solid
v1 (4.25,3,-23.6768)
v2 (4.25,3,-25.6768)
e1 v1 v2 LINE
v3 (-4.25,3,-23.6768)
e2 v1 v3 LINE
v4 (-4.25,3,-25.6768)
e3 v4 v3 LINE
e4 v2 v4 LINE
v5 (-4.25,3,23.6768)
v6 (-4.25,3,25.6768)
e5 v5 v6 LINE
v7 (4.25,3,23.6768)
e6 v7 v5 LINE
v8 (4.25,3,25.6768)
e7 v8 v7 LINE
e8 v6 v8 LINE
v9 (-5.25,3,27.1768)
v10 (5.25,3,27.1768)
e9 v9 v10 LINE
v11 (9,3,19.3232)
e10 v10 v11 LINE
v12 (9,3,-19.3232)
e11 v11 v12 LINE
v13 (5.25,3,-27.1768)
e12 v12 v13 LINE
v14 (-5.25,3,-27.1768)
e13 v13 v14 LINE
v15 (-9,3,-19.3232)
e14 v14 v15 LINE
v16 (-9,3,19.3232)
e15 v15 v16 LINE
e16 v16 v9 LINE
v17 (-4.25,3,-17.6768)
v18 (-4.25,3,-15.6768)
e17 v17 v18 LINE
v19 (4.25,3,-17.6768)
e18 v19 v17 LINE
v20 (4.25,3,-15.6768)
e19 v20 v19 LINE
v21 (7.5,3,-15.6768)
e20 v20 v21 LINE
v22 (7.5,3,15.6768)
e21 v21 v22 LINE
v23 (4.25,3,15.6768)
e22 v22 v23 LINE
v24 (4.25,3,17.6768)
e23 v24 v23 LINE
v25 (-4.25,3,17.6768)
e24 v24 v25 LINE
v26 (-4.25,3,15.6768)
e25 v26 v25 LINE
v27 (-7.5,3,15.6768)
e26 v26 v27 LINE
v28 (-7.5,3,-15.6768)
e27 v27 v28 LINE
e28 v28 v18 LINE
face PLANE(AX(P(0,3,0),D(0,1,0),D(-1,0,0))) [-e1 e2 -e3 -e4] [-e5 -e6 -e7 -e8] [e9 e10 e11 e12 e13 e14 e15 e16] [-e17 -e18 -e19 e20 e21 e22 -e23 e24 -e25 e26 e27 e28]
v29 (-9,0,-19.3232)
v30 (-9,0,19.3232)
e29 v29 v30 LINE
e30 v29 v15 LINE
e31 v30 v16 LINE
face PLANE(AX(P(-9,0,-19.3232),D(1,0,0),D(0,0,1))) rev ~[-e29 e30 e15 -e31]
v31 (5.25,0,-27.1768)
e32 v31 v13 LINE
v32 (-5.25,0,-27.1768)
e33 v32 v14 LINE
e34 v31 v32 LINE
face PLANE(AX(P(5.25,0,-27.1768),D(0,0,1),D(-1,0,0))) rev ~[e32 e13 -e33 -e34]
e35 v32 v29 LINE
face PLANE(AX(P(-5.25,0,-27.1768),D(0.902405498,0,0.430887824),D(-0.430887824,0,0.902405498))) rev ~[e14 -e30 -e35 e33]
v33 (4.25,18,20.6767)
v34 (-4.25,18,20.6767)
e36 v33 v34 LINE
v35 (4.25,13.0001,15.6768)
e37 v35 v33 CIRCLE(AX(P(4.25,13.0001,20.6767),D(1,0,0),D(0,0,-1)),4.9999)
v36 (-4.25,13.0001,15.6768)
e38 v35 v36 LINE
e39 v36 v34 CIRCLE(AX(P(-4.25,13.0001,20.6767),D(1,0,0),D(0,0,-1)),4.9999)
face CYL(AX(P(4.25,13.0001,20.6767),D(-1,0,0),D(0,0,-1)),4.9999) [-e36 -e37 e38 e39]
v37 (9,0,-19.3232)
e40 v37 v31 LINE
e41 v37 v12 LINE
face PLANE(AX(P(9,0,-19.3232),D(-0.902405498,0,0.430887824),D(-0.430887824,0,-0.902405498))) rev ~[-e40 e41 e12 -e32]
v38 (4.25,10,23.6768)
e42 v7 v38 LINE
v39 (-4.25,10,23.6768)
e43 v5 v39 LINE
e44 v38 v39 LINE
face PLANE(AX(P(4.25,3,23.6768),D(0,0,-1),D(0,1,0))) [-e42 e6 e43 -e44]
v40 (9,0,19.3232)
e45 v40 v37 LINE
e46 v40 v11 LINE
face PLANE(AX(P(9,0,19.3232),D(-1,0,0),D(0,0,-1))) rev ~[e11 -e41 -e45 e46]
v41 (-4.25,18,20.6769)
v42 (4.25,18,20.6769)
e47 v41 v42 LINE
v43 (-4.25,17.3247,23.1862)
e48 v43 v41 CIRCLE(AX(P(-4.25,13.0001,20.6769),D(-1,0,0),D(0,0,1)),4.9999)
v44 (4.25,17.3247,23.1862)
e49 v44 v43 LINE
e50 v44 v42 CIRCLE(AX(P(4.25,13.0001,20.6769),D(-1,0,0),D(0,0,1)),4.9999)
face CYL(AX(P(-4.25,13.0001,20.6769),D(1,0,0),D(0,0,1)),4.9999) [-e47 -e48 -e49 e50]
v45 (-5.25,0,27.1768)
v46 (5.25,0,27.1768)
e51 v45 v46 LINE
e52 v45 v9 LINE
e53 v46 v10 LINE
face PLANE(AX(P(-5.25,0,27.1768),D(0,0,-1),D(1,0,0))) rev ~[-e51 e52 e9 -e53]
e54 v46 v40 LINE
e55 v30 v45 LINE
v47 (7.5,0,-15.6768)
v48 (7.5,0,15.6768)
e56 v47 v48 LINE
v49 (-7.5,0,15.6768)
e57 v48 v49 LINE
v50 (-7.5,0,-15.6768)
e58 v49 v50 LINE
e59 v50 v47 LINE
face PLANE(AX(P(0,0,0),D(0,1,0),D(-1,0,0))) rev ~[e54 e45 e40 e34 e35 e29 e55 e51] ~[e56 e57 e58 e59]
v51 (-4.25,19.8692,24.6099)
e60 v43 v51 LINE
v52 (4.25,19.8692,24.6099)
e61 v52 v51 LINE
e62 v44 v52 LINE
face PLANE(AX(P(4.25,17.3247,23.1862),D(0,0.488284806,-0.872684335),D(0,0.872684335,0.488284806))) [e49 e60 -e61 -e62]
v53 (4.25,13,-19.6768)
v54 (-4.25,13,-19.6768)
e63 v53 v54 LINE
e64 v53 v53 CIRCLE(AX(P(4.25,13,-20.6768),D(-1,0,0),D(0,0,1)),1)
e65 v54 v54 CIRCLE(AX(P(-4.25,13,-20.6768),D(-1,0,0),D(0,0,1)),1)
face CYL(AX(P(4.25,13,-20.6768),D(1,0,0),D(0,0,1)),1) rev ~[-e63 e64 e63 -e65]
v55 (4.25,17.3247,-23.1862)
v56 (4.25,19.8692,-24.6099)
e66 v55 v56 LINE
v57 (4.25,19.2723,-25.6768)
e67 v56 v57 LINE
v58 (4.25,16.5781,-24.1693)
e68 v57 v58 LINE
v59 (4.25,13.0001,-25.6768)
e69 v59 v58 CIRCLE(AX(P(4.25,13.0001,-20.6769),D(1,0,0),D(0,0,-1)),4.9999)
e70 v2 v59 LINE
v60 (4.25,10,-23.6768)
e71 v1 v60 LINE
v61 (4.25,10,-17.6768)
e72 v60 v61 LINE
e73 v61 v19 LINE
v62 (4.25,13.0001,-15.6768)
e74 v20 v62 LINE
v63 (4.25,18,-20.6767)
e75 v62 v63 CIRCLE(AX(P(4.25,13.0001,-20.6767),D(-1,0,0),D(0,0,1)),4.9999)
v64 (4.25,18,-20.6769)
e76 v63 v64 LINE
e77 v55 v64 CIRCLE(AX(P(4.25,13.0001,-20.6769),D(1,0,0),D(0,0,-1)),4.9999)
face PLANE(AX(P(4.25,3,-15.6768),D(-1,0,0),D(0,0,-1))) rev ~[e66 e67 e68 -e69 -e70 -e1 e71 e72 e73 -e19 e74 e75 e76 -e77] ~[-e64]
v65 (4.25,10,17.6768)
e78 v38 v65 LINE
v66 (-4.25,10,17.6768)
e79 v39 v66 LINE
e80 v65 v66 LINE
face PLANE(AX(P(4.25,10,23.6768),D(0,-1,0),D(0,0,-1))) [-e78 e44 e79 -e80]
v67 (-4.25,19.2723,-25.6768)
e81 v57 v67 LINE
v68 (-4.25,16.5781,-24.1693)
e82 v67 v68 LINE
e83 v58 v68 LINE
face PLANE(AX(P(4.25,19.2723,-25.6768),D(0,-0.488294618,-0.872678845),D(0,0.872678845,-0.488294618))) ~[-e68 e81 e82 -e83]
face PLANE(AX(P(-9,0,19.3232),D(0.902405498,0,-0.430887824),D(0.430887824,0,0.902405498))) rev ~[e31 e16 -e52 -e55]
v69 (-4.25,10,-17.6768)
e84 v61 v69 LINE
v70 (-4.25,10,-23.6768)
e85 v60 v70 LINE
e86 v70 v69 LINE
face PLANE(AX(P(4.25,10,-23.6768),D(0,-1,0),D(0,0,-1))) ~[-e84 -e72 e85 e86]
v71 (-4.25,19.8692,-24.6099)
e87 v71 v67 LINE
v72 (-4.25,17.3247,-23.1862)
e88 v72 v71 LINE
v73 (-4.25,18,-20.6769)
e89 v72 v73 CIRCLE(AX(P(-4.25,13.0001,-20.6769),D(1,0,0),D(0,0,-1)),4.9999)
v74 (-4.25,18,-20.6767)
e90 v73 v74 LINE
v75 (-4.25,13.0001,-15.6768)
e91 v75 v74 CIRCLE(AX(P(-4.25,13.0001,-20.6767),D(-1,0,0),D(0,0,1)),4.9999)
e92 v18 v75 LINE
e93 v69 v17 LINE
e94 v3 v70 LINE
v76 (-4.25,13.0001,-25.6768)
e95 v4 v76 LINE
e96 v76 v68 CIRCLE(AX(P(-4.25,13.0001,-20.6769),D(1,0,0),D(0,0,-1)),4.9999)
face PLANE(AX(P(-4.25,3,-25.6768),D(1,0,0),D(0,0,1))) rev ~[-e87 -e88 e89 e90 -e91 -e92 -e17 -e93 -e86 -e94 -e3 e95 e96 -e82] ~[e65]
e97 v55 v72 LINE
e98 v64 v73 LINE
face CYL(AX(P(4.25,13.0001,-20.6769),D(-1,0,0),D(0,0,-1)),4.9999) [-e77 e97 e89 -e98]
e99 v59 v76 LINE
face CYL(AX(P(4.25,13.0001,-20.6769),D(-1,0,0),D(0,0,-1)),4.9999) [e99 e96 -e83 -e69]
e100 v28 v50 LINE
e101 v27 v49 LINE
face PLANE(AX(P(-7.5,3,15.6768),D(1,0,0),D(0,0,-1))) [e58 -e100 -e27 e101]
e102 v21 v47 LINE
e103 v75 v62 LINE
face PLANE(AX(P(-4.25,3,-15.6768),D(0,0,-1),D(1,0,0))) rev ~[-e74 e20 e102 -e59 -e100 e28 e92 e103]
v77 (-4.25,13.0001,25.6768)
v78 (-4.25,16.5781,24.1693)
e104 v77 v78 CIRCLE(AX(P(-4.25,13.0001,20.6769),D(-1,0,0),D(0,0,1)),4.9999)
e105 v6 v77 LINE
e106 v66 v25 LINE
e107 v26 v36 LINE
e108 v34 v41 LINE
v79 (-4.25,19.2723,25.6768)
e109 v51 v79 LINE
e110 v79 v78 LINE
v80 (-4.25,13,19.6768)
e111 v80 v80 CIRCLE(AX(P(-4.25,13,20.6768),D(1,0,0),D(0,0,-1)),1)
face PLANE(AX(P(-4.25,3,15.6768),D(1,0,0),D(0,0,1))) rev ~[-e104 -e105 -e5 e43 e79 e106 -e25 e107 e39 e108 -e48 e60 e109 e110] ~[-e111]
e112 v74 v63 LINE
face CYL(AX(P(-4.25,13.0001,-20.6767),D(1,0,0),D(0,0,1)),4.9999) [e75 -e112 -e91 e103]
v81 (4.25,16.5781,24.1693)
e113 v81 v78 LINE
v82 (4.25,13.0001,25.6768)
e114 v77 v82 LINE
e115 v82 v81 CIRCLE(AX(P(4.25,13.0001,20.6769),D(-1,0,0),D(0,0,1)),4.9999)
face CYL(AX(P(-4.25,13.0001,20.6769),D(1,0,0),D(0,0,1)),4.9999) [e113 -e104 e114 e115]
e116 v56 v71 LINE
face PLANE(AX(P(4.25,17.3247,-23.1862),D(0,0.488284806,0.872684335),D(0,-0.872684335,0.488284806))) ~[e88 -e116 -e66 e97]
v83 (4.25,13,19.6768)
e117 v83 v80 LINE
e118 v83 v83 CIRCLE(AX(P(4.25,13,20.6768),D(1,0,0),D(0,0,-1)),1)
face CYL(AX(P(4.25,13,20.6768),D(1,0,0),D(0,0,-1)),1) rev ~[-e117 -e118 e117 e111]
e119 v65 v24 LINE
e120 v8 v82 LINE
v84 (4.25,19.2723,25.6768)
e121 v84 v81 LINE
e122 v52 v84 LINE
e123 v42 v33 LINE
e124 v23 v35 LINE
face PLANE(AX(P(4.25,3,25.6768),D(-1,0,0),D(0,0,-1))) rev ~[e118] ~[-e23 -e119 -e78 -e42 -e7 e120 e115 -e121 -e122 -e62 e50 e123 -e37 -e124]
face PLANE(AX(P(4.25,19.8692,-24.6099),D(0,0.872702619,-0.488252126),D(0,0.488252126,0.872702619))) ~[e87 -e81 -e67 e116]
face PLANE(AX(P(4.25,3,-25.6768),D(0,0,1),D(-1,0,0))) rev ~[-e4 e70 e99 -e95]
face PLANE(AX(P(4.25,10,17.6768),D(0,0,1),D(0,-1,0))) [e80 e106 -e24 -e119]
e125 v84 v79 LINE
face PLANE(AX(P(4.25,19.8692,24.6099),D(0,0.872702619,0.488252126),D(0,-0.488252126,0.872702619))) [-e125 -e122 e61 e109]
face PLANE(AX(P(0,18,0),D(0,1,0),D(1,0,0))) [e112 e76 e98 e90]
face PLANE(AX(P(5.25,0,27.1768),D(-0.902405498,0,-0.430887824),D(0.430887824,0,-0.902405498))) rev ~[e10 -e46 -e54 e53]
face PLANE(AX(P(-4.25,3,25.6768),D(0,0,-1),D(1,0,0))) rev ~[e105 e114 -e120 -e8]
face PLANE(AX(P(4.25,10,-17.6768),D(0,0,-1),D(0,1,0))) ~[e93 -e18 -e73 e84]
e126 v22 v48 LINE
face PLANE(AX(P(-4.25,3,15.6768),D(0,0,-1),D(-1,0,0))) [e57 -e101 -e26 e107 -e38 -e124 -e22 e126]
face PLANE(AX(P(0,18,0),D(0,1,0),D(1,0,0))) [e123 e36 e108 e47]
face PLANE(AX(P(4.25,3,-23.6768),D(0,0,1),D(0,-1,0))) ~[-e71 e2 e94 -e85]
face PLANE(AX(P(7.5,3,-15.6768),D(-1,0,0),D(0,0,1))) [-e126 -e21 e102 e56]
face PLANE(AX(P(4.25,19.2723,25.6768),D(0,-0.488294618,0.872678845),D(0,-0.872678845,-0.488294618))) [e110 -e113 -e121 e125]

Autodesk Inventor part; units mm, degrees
ref_plane "YZ Plane" through (0, 0, 0) normal (1, 0, 0) x (0, 1, 0)
ref_plane "XZ Plane" through (0, 0, 0) normal (0, 1, 0) x (-1, 0, 0)
ref_plane "XY Plane" through (0, 0, 0) normal (0, 0, 1) x (1, 0, 0)
sketch "Sketch1" plane through (0, 0, 0) normal (0, 1, 0) x (-1, 0, 0)
  line L0 (5.25, 27.1768) -> (-5.25, 27.1768)
  line L1 (-5.25, 27.1768) -> (-9, 19.3232)
  line L2 (-9, 19.3232) -> (-9, -19.3232)
  line L3 (-9, -19.3232) -> (-5.25, -27.1768)
  line L4 (-5.25, -27.1768) -> (5.25, -27.1768)
  line L5 (5.25, -27.1768) -> (9, -19.3232)
  line L6 (9, -19.3232) -> (9, 19.3232)
  line L7 (9, 19.3232) -> (5.25, 27.1768)
  line L8 (4.25, 25.6768) -> (-4.25, 25.6768)
  line L9 (-4.25, 25.6768) -> (-4.25, 19.3232)
  line L10 (-4.25, 19.3232) -> (4.25, 19.3232)
  line L11 (4.25, 19.3232) -> (4.25, 25.6768)
  line L12 (4.25, -19.3232) -> (-4.25, -19.3232)
  line L13 (-4.25, -19.3232) -> (-4.25, -25.6768)
  line L14 (-4.25, -25.6768) -> (4.25, -25.6768)
  line L15 (4.25, -25.6768) -> (4.25, -19.3232)
  point P0 (0, 0)
  point P1 (0, 22.5)
  point P2 (0, -22.5)
  point P3 (0, 25.6768)
  point P4 (0, 27.1768)
  point P5 (0, -25.6768)
  point P6 (0, -27.1768)
  point P7 (4.25, 22.5)
  point P8 (0, 19.3232)
  point P9 (0, -19.3232)
  point P10 (4.25, -22.5)
  point P11 (9, 0)
  dimension "d0" = 18
  dimension "d1" = 1.5
  dimension "d2" = 1.5
  dimension "d3" = 8.5
  dimension "d4" = 8.5
  dimension "d6" = 10.5
  dimension "d7" = 10.5
  dimension "d8" = 9
  dimension "d12" = 115.524
  dimension "d13" = 115.524
  dimension "d14" = 115.524
  dimension "d15" = 115.524
  dimension "d16" = 45
extrude "Extrusion1" add sketch "Sketch1" along normal blind 3 contours L7 L6 L5 L4 L3 L2 L1 L0 | L11 L10 L9 L8 | L15 L14 L13 L12
sketch "Sketch2" plane through (0, 3, 0) normal (0, 1, 0) x (1, 0, 0)
  line L0 (5.25, -27.1768) -> (9, -19.3232) projected
  line L1 (9, -19.3232) -> (9, 19.3232) projected
  line L2 (9, 19.3232) -> (5.25, 27.1768) projected
  line L3 (5.25, 27.1768) -> (-5.25, 27.1768) projected
  line L4 (-5.25, 27.1768) -> (-9, 19.3232) projected
  line L5 (-9, 19.3232) -> (-9, -19.3232) projected
  line L6 (-9, -19.3232) -> (-5.25, -27.1768) projected
  line L7 (-5.25, -27.1768) -> (5.25, -27.1768) projected
  line L8 (-4.25, -25.6768) -> (4.25, -25.6768)
  line L9 (4.25, -25.6768) -> (4.25, -15.6768)
  line L10 (4.25, -15.6768) -> (-4.25, -15.6768)
  line L11 (-4.25, -15.6768) -> (-4.25, -25.6768)
  line L12 (-4.25, 15.6768) -> (4.25, 15.6768)
  line L13 (4.25, 15.6768) -> (4.25, 25.6768)
  line L14 (4.25, 25.6768) -> (-4.25, 25.6768)
  line L15 (-4.25, 25.6768) -> (-4.25, 15.6768)
  point P0 (0, 0)
  point P1 (0, -25.6768)
  point P2 (0, -27.1768)
  dimension "d19" = 1.5
  dimension "d20" = 1.5
  dimension "d21" = 8.5
  dimension "d22" = 8.5
  dimension "d23" = 10
  dimension "d24" = 10
extrude "Extrusion2" add sketch "Sketch2" along normal blind 15 contours L11 L10 L9 L8 | L15 L14 L13 L12
fillet "Fillet1" radius 5 4 edges at (0, 18, 25.6768) (0, 18, 15.6768) (0, 18, -15.6768) (0, 18, -25.6768)
sketch "Sketch3" plane through (4.25, 3, 25.6768) normal (1, 0, 0) x (0, 0, -1)
  arc A0 (10, 10) -> (0, 10) centre (5, 10) ccw projected
  line L0 (0, 0) -> (0, 10) projected
  line L1 (10, 0) -> (0, 0) projected
  line L2 (10, 0) -> (10, 10) projected
  circle A1 centre (5, 10) radius 1
  arc A2 (10, 10) -> (0, 10) centre (5, 10) ccw projected
  line L3 (2.4906, 14.3247) -> (1.0669, 16.8692)
  line L4 (1.0669, 16.8692) -> (0, 16.2723)
  line L5 (0, 16.2723) -> (1.5075, 13.5781)
  arc A3 (2.4906, 14.3247) -> (1.5075, 13.5781) centre (5, 10) ccw
  point P0 (25.6768, -3)
  point P1 (1.5075, 13.5781)
  point P2 (2.4906, 14.3247)
  dimension "d28" = 2
extrude "Extrusion3" add sketch "Sketch3" against normal up to surface (8.5 mm away) contours A0 L5 L4 L3
extrude "Extrusion4" cut sketch "Sketch3" against normal up to surface (8.5 mm away) contours A1
sketch "Sketch4" plane through (0, 3, 0) normal (0, 1, 0) x (1, 0, 0)
  line L0 (4.25, 15.6768) -> (-4.25, 15.6768) projected
  line L1 (-4.25, 15.6768) -> (-4.25, 25.6768) projected
  line L2 (-4.25, 25.6768) -> (4.25, 25.6768) projected
  line L3 (4.25, 25.6768) -> (4.25, 15.6768) projected
  line L4 (4.25, -25.6768) -> (-4.25, -25.6768) projected
  line L5 (-4.25, -25.6768) -> (-4.25, -15.6768) projected
  line L6 (-4.25, -15.6768) -> (4.25, -15.6768) projected
  line L7 (4.25, -15.6768) -> (4.25, -25.6768) projected
  line L8 (5.25, -27.1768) -> (9, -19.3232) projected
  line L9 (9, -19.3232) -> (9, 19.3232) projected
  line L10 (9, 19.3232) -> (5.25, 27.1768) projected
  line L11 (5.25, 27.1768) -> (-5.25, 27.1768) projected
  line L12 (-5.25, 27.1768) -> (-9, 19.3232) projected
  line L13 (-9, 19.3232) -> (-9, -19.3232) projected
  line L14 (-9, -19.3232) -> (-5.25, -27.1768) projected
  line L15 (-5.25, -27.1768) -> (5.25, -27.1768) projected
  line L16 (-7.5, 15.6768) -> (7.5, 15.6768)
  line L17 (7.5, 15.6768) -> (7.5, -15.6768)
  line L18 (7.5, -15.6768) -> (-7.5, -15.6768)
  line L19 (-7.5, -15.6768) -> (-7.5, 15.6768)
  point P0 (0, 0)
  dimension "d33" = 1.5
  dimension "d34" = 1.5
extrude "Extrusion5" cut sketch "Sketch4" against normal up to surface (3 mm away) contours L16 L17 L18 L6 L19 L0
sketch "Sketch5" plane through (4.25, 3, 25.6768) normal (1, 0, 0) x (0, 0, -1)
  line L0 (6.3537, 0) -> (45, 0) projected
  line L1 (2, 7) -> (8, 7)
  line L2 (8, 7) -> (8, 0)
  line L3 (8, 0) -> (2, 0)
  line L4 (2, 0) -> (2, 7)
  line L5 (0, 0) -> (0, 10) projected
  line L6 (10, 0) -> (10, 10) projected
  circle A0 centre (5, 10) radius 1 projected
  point P0 (25.6768, -3)
  point P1 (6.3537, 0)
  dimension "d37" = 2
  dimension "d38" = 2
  dimension "d39" = 2
extrude "Extrusion6" cut sketch "Sketch5" against normal up to surface (8.5 mm away) contours L3 L4 L1 L2 L0
mirror "Mirror1" about plane through (0, 0, 0) normal (0, 0, 1) of "Extrusion3", "Extrusion6", "Extrusion4"
equation "\"d7\" = d6"
equation "\"d13\" = d12"
equation "\"d14\" = d12"
equation "\"d15\" = d12"
equation "\"d20\" = d19"
equation "\"d24\" = d23"
properties part number "PalmWithBackstop"
